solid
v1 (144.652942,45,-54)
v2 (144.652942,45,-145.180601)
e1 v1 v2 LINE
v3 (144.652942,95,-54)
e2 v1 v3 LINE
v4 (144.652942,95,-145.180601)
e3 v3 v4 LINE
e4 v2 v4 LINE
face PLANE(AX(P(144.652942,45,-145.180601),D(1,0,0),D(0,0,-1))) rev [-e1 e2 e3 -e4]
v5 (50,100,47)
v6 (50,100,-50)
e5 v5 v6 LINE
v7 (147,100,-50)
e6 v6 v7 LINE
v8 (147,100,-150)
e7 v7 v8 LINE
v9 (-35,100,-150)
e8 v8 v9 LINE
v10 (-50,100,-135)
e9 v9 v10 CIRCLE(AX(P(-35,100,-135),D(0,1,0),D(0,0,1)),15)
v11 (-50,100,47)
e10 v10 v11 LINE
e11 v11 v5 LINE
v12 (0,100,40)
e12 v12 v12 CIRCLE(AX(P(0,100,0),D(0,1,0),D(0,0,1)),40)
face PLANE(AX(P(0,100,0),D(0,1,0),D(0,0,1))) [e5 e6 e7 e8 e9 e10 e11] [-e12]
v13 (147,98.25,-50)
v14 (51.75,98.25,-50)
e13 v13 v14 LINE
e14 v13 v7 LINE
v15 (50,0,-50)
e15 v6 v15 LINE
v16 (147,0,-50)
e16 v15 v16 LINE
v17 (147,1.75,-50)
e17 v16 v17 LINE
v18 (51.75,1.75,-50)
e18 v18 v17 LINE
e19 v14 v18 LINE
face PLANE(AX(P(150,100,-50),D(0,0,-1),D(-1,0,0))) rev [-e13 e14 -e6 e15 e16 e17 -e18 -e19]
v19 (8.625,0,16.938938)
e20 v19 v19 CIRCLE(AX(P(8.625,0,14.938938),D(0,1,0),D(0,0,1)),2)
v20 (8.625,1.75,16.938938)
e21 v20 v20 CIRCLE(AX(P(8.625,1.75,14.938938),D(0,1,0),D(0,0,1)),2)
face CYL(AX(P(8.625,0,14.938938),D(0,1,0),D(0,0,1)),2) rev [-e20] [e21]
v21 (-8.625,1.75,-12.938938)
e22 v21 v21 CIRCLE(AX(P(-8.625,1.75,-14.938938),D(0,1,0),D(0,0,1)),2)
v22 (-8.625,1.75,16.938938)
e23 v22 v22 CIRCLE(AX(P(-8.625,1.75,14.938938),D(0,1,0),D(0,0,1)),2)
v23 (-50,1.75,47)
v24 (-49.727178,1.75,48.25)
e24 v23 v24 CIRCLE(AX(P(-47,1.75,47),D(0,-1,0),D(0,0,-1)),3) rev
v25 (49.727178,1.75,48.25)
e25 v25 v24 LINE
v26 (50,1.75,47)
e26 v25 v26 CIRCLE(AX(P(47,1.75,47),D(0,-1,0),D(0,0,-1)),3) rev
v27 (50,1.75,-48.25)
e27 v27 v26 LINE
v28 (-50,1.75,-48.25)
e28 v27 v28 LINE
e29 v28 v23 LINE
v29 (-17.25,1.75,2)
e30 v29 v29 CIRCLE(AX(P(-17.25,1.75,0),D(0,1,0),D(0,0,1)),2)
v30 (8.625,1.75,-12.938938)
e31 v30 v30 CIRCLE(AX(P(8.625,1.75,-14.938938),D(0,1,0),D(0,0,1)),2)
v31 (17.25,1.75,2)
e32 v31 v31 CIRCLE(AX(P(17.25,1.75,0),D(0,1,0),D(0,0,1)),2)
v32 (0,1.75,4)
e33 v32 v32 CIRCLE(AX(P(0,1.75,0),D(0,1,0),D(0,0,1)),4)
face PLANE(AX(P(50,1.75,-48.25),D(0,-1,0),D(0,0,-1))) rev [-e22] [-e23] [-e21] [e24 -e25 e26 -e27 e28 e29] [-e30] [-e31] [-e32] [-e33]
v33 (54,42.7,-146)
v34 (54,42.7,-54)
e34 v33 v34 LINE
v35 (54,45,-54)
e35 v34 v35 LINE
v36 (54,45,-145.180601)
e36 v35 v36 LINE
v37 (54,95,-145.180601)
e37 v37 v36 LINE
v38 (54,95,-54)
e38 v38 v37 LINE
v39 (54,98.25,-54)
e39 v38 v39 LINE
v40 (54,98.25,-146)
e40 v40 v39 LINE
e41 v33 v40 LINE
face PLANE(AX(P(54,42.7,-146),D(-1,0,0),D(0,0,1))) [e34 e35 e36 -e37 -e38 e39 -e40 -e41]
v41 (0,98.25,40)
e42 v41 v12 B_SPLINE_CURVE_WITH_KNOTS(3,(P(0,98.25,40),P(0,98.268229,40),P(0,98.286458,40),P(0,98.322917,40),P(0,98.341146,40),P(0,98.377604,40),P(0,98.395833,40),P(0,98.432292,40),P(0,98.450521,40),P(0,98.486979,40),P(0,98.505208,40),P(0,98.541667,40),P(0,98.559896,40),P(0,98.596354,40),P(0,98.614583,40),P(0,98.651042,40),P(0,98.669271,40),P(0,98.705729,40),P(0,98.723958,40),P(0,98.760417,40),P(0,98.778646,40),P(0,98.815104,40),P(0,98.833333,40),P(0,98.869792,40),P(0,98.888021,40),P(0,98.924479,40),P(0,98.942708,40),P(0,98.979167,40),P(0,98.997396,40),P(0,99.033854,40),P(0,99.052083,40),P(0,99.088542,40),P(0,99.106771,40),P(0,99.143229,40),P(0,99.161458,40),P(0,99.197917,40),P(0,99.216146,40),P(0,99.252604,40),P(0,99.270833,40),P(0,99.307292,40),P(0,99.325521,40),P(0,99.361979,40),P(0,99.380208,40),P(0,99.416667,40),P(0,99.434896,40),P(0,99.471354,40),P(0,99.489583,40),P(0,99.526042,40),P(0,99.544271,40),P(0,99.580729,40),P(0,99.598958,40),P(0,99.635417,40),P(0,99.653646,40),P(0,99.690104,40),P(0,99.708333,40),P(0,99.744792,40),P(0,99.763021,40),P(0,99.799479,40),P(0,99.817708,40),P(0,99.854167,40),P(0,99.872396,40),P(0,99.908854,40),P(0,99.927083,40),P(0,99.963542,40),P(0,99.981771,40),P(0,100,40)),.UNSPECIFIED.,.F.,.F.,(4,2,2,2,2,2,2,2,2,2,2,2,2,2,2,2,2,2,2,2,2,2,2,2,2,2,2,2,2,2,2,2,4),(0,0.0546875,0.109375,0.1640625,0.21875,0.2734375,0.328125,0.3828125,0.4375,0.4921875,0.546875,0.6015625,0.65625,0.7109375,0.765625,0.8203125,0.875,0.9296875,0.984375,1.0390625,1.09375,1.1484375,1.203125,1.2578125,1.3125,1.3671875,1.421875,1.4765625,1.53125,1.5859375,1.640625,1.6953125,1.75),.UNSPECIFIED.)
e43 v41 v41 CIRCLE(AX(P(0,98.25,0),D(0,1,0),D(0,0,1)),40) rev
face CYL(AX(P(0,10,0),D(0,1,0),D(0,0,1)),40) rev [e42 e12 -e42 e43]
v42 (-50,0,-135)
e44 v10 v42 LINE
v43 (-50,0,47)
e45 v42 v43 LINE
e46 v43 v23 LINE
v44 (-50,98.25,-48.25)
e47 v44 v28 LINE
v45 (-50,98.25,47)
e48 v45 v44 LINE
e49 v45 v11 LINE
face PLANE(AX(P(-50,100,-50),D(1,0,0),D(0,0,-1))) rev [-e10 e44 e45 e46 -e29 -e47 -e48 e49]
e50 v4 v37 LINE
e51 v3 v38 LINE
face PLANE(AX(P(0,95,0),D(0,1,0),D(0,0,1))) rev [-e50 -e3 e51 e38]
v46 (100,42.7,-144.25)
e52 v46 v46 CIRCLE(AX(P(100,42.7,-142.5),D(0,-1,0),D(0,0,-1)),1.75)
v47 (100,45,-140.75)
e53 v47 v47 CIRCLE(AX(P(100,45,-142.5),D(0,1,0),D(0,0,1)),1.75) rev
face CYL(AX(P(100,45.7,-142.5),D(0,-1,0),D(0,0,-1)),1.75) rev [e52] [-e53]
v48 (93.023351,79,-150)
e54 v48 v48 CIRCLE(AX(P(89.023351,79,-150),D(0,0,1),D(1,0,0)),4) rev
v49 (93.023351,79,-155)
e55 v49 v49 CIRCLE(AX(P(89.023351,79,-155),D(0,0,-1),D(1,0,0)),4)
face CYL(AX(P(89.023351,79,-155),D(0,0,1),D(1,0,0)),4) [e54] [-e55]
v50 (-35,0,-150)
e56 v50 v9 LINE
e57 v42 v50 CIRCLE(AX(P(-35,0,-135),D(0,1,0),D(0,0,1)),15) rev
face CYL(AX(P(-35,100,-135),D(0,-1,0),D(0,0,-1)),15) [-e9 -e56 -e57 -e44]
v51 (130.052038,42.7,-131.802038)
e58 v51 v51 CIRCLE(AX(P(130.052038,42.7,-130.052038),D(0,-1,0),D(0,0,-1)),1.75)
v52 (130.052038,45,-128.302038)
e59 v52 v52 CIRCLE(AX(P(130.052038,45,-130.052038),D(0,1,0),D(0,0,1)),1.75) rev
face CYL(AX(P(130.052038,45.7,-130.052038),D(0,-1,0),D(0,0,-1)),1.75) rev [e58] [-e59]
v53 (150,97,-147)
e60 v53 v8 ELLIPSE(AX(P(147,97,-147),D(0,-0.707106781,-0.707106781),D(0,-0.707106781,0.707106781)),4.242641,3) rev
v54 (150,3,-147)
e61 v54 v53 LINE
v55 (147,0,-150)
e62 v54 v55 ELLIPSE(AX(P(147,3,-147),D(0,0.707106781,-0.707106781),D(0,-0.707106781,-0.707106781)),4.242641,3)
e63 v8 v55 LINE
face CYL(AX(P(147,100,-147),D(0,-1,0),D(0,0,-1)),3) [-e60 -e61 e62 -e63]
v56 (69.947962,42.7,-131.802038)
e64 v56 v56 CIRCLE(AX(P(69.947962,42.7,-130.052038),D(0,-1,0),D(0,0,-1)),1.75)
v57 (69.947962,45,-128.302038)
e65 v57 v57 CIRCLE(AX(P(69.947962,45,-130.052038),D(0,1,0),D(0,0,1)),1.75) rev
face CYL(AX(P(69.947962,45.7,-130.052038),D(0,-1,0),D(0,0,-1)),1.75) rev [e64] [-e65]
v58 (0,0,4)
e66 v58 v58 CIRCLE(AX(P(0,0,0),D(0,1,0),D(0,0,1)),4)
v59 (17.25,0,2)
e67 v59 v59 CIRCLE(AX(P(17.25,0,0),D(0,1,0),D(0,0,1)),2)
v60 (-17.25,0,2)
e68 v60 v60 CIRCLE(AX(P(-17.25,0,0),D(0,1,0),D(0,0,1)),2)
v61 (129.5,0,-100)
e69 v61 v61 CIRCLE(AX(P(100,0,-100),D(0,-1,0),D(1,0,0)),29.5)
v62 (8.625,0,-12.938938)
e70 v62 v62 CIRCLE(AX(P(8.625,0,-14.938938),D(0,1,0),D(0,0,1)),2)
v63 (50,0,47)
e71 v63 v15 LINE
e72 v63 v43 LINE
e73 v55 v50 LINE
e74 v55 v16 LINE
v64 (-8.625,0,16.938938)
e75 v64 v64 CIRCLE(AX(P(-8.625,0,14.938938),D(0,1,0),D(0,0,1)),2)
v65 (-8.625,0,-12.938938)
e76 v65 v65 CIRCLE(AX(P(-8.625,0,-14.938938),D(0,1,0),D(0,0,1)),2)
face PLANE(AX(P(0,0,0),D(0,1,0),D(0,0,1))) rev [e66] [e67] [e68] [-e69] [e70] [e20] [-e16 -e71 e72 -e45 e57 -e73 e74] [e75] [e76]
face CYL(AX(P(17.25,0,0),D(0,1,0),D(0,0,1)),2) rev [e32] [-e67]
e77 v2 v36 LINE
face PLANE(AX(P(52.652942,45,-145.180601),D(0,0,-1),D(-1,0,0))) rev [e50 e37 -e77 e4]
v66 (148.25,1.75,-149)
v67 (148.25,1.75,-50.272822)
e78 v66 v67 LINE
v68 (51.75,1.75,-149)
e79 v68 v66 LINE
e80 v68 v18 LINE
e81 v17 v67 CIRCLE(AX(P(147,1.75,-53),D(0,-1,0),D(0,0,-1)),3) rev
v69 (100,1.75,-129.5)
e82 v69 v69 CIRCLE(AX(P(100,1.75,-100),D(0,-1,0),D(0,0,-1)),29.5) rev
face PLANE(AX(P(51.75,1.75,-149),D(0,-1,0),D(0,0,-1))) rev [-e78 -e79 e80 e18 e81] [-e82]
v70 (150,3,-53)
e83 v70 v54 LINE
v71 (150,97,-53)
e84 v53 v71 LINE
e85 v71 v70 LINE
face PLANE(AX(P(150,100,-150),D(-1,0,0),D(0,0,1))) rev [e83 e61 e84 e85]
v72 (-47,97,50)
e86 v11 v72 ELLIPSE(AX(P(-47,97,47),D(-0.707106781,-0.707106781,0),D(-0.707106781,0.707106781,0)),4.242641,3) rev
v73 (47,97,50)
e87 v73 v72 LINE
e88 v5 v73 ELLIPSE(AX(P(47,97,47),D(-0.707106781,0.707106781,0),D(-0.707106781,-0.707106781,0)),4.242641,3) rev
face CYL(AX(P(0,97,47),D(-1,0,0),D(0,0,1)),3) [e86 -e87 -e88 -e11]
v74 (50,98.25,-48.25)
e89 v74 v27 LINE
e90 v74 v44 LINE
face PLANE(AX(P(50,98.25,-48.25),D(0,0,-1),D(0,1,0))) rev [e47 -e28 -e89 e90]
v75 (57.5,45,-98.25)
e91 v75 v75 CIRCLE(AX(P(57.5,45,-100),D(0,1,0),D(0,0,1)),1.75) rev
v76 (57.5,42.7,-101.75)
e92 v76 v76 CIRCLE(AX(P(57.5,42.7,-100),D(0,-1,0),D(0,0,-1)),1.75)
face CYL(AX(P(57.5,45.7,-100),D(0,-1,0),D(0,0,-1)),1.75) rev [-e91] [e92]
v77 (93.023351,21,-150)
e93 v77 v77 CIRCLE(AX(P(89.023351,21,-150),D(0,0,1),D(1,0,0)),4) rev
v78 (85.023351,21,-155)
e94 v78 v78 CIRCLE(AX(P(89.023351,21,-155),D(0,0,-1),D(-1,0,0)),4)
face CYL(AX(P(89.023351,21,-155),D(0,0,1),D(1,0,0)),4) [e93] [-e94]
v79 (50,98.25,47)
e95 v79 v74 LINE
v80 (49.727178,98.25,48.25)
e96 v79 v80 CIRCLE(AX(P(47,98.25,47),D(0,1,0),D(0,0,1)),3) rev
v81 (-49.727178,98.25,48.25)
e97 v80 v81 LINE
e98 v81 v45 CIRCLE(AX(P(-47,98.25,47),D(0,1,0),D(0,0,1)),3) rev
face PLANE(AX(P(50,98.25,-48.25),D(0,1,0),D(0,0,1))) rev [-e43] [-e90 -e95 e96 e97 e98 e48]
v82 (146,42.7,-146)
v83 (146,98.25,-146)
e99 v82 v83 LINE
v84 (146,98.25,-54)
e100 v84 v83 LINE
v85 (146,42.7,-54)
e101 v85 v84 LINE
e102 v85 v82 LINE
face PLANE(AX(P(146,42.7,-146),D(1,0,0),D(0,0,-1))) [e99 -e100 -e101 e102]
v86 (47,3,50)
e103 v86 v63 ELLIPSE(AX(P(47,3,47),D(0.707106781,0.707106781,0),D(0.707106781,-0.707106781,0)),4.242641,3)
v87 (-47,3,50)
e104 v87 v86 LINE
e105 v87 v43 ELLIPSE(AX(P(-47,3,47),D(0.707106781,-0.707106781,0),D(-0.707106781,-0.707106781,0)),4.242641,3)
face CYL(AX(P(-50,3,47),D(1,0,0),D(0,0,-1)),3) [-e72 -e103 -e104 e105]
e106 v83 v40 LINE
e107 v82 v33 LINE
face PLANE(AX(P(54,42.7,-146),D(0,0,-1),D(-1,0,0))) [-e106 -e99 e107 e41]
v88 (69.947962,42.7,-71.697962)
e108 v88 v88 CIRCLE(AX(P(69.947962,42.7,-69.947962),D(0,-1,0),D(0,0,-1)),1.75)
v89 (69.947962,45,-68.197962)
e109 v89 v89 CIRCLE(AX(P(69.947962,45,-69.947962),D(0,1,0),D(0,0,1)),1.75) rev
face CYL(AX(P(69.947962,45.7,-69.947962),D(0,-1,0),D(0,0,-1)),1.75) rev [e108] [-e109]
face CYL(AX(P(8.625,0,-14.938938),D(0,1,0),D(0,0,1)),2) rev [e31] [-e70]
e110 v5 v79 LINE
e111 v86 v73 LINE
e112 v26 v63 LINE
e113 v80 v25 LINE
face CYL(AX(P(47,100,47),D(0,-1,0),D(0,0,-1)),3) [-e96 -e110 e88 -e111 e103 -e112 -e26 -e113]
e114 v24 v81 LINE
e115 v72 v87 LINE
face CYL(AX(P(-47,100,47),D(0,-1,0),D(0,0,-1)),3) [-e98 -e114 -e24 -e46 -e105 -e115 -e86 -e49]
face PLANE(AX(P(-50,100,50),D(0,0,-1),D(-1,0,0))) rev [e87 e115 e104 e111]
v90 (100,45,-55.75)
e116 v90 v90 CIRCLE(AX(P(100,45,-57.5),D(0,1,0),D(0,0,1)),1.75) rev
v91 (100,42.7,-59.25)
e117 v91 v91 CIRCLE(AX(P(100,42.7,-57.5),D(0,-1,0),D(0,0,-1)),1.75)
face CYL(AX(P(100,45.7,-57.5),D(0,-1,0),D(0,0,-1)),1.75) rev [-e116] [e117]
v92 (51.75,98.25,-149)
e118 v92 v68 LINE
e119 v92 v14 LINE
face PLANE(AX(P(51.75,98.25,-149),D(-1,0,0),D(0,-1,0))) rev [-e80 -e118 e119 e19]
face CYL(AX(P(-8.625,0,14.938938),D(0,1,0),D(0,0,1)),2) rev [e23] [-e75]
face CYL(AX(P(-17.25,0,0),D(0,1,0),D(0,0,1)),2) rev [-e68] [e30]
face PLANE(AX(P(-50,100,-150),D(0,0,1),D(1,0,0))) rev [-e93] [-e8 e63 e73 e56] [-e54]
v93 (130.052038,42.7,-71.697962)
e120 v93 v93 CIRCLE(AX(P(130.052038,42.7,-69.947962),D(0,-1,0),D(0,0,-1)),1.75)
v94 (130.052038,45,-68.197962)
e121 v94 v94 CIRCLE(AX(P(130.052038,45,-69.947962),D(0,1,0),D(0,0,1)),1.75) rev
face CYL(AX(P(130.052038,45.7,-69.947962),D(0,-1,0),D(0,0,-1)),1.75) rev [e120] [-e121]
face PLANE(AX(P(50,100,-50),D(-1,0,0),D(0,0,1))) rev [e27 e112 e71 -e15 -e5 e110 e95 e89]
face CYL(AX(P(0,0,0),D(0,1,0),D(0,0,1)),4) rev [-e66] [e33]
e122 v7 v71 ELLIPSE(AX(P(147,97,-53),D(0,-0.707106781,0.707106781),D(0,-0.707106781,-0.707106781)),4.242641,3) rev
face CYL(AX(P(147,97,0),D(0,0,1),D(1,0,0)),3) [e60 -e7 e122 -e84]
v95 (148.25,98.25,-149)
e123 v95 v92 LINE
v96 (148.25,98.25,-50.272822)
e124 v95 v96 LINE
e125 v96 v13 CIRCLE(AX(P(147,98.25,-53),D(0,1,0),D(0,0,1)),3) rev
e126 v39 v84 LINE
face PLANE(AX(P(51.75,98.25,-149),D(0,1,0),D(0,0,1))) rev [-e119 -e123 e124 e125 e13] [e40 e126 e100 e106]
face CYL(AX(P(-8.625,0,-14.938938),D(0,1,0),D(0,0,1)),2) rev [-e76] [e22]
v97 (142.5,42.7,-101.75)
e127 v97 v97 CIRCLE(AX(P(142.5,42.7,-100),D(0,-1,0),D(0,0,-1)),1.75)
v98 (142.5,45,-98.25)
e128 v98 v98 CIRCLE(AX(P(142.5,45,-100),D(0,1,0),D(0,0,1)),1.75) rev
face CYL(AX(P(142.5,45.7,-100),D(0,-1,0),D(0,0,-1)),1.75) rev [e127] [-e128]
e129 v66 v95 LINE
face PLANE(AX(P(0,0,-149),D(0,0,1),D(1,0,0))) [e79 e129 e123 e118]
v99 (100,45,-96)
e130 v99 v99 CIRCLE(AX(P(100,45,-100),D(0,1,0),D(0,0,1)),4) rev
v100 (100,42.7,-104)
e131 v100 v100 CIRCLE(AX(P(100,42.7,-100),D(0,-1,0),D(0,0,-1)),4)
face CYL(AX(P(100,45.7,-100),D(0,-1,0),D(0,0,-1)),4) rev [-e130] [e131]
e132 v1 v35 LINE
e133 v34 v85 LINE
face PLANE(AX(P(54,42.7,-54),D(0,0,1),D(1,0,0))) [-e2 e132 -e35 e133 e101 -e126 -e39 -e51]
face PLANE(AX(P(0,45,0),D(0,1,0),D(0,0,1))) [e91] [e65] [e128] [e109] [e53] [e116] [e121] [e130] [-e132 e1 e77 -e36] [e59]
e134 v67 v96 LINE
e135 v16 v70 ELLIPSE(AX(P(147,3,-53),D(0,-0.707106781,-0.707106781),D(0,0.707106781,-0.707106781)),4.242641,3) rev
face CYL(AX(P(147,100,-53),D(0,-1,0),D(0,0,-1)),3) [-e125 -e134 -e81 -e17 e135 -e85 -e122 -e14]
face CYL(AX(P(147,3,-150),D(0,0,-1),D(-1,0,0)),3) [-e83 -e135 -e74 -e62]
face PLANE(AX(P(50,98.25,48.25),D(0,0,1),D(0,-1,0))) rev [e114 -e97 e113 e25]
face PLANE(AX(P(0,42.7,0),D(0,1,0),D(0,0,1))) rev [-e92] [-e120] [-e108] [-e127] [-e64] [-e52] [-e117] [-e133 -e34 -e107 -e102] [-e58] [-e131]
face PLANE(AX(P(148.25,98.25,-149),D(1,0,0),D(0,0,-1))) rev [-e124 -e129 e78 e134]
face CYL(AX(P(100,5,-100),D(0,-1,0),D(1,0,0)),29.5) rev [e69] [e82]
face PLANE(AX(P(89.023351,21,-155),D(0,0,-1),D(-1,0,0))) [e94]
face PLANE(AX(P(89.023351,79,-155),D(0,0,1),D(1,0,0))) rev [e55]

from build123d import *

# Parameters (mm, degrees)
EXTRUDE_1_DEPTH      = 100
SKETCH_2_R           = 40
CUT_EXTRUDE_1_DEPTH  = 90
SKETCH_9_W           = 96.5
SKETCH_9_H           = 96.5
CUT_EXTRUDE_3_DEPTH  = 100
SKETCH_15_R          = 4
EXTRUDE_4_DEPTH      = 5
SKETCH_16_R          = 29.5
CUT_EXTRUDE_5_DEPTH  = 5
SKETCH_19_W          = 96.5
SKETCH_19_H          = 96.5
CUT_EXTRUDE_8_DEPTH  = 99
SKETCH_20_R          = 2
SKETCH_20_R_2        = 4
CUT_EXTRUDE_9_DEPTH  = 1.75
SKETCH_23_W          = 92
SKETCH_23_H          = 92
EXTRUDE_5_DEPTH      = 57.3
SKETCH_24_R          = 1.75
SKETCH_24_R_2        = 4
CUT_EXTRUDE_10_DEPTH = 3
CUT_EXTRUDE_START    = -5
SKETCH_27_W          = 92
SKETCH_27_H          = 92
CUT_EXTRUDE_12_DEPTH = 50
FILLET_2_R           = 3
FILLET_6_R           = 15


with BuildPart() as part:
    # 草图1 → 凸台-拉伸1 (new body)
    with BuildSketch(Plane(origin=(0, 0, 0), x_dir=(1, 0, 0), z_dir=(0, 1, 0))):
        Polygon((-50, 50), (-50, 150), (50, 150), (150, 150), (150, 50), (50, 50), (50, -50), (-50, -50), align=None)
    extrude(amount=EXTRUDE_1_DEPTH)

    # 草图2 → 切除-拉伸1 (cut)
    with BuildSketch(Plane(origin=(0, 100, 0), x_dir=(1, 0, 0), z_dir=(0, 1, 0))):
        with Locations(Location((0, 0, 0), (0, 0, 270))):
            Circle(SKETCH_2_R)
    extrude(amount=-CUT_EXTRUDE_1_DEPTH, mode=Mode.SUBTRACT)

    # 草图9 → 切除-拉伸3 (cut)
    with BuildSketch(Plane.ZY.offset(50)):
        with Locations((0, 50)):
            Rectangle(SKETCH_9_W, SKETCH_9_H)
    extrude(amount=-CUT_EXTRUDE_3_DEPTH, mode=Mode.SUBTRACT)

    # 草图15 → 凸台-拉伸4 (add)
    with BuildSketch(Plane(origin=(0, 0, -150), x_dir=(-1, 0, 0), z_dir=(0, 0, -1))):
        with Locations(Location((-89.023351099, 21, 0), (0, 0, 180))):
            Circle(SKETCH_15_R)
        with Locations(Location((-89.023351099, 79, 0), (0, 0, 180))):
            Circle(SKETCH_15_R)
    extrude(amount=EXTRUDE_4_DEPTH)

    # 草图16 → 切除-拉伸5 (cut)
    with BuildSketch(Plane.XZ):
        with Locations((100, -100)):
            Circle(SKETCH_16_R)
    extrude(amount=-CUT_EXTRUDE_5_DEPTH, mode=Mode.SUBTRACT)

    # 草图19 → 切除-拉伸8 (cut)
    with BuildSketch(Plane.XY.offset(-50)):
        with Locations((100, 50)):
            Rectangle(SKETCH_19_W, SKETCH_19_H)
    extrude(amount=-CUT_EXTRUDE_8_DEPTH, mode=Mode.SUBTRACT)

    # 草图20 → 切除-拉伸9 (cut)
    with BuildSketch(Plane(origin=(0, 1.75, 0), x_dir=(1, 0, 0), z_dir=(0, 1, 0))):
        with Locations(Location((17.25, 0, 0), (0, 0, 270))):
            Circle(SKETCH_20_R)
        with Locations(Location((8.625, -14.938938215, 0), (0, 0, 270))):
            Circle(SKETCH_20_R)
        with Locations(Location((-8.625, -14.938938215, 0), (0, 0, 270))):
            Circle(SKETCH_20_R)
        with Locations(Location((-17.25, 0, 0), (0, 0, 270))):
            Circle(SKETCH_20_R)
        with Locations(Location((-8.625, 14.938938215, 0), (0, 0, 270))):
            Circle(SKETCH_20_R)
        with Locations(Location((8.625, 14.938938215, 0), (0, 0, 270))):
            Circle(SKETCH_20_R)
        with Locations(Location((0, 0, 0), (0, 0, 270))):
            Circle(SKETCH_20_R_2)
    extrude(amount=-CUT_EXTRUDE_9_DEPTH, mode=Mode.SUBTRACT)

    # 草图23 → 凸台-拉伸5 (add)
    with BuildSketch(Plane(origin=(0, 100, 0), x_dir=(1, 0, 0), z_dir=(0, 1, 0))):
        with Locations((100, 100)):
            Rectangle(SKETCH_23_W, SKETCH_23_H)
    extrude(amount=-EXTRUDE_5_DEPTH)

    # 草图24 → 切除-拉伸10 (cut)
    with BuildSketch(Plane.XZ.offset(-42.7)):
        with Locations(Location((100, -57.5, 0), (0, 0, 270))):
            Circle(SKETCH_24_R)
        with Locations(Location((130.0520382, -69.9479618, 0), (0, 0, 270))):
            Circle(SKETCH_24_R)
        with Locations(Location((142.5, -100, 0), (0, 0, 270))):
            Circle(SKETCH_24_R)
        with Locations(Location((130.0520382, -130.0520382, 0), (0, 0, 270))):
            Circle(SKETCH_24_R)
        with Locations(Location((100, -142.5, 0), (0, 0, 270))):
            Circle(SKETCH_24_R)
        with Locations(Location((69.9479618, -130.0520382, 0), (0, 0, 270))):
            Circle(SKETCH_24_R)
        with Locations(Location((57.5, -100, 0), (0, 0, 270))):
            Circle(SKETCH_24_R)
        with Locations(Location((69.9479618, -69.9479618, 0), (0, 0, 270))):
            Circle(SKETCH_24_R)
        with Locations(Location((100, -100, 0), (0, 0, 270))):
            Circle(SKETCH_24_R_2)
    extrude(amount=-CUT_EXTRUDE_10_DEPTH, mode=Mode.SUBTRACT)

    # 草图27 → 切除-拉伸12 (cut)
    with BuildSketch(Plane(origin=(0, 100, 0), x_dir=(1, 0, 0), z_dir=(0, 1, 0)).offset(CUT_EXTRUDE_START)):
        with Locations((98.652941691, 99.180600888)):
            Rectangle(SKETCH_27_W, SKETCH_27_H)
    extrude(amount=-CUT_EXTRUDE_12_DEPTH, mode=Mode.SUBTRACT)

    # 圆角2
    # the kernel refuses this fillet: 3 mm, written as the material it takes off along each edge
    with BuildSketch(Plane(origin=(50, -7.5, 50), x_dir=(-1, 0, 0), z_dir=(0, 1, 0)), Plane(origin=(57.5, 0, 50), x_dir=(0, 0, -1), z_dir=(-1, 0, 0)), Plane(origin=(-50, -7.5, 50), x_dir=(0, 0, -1), z_dir=(0, 1, 0)), Plane(origin=(150, 0, -157.5), x_dir=(-1, 0, 0), z_dir=(0, 0, 1))) as fillet_2_piece_1:
        with BuildLine():
            CenterArc((FILLET_2_R, -FILLET_2_R), FILLET_2_R, 90, 90)
            Line((0, -FILLET_2_R), (0, 0))
            Line((0, 0), (FILLET_2_R, 0))
        make_face()
    extrude(amount=115, mode=Mode.SUBTRACT)
    with BuildSketch(Plane(origin=(57.5, 100, 50), x_dir=(0, 0, -1), z_dir=(-1, 0, 0)), Plane(origin=(150, 100, -157.5), x_dir=(-1, 0, 0), z_dir=(0, 0, 1)), Plane(origin=(150, -7.5, -50), x_dir=(0, 0, -1), z_dir=(0, 1, 0)), Plane(origin=(150, -7.5, -150), x_dir=(-1, 0, 0), z_dir=(0, 1, 0))) as fillet_2_piece_2:
        with BuildLine():
            CenterArc((FILLET_2_R, FILLET_2_R), FILLET_2_R, 180, 90)
            Line((0, FILLET_2_R), (0, 0))
            Line((0, 0), (FILLET_2_R, 0))
        make_face()
    extrude(amount=115, mode=Mode.SUBTRACT)

    # 圆角6
    fillet_6_edges = [part.edges().sort_by_distance(p)[0] for p in [
        (-50, 50, -150),
    ]]
    fillet(fillet_6_edges, radius=FILLET_6_R)


solid = part.part
